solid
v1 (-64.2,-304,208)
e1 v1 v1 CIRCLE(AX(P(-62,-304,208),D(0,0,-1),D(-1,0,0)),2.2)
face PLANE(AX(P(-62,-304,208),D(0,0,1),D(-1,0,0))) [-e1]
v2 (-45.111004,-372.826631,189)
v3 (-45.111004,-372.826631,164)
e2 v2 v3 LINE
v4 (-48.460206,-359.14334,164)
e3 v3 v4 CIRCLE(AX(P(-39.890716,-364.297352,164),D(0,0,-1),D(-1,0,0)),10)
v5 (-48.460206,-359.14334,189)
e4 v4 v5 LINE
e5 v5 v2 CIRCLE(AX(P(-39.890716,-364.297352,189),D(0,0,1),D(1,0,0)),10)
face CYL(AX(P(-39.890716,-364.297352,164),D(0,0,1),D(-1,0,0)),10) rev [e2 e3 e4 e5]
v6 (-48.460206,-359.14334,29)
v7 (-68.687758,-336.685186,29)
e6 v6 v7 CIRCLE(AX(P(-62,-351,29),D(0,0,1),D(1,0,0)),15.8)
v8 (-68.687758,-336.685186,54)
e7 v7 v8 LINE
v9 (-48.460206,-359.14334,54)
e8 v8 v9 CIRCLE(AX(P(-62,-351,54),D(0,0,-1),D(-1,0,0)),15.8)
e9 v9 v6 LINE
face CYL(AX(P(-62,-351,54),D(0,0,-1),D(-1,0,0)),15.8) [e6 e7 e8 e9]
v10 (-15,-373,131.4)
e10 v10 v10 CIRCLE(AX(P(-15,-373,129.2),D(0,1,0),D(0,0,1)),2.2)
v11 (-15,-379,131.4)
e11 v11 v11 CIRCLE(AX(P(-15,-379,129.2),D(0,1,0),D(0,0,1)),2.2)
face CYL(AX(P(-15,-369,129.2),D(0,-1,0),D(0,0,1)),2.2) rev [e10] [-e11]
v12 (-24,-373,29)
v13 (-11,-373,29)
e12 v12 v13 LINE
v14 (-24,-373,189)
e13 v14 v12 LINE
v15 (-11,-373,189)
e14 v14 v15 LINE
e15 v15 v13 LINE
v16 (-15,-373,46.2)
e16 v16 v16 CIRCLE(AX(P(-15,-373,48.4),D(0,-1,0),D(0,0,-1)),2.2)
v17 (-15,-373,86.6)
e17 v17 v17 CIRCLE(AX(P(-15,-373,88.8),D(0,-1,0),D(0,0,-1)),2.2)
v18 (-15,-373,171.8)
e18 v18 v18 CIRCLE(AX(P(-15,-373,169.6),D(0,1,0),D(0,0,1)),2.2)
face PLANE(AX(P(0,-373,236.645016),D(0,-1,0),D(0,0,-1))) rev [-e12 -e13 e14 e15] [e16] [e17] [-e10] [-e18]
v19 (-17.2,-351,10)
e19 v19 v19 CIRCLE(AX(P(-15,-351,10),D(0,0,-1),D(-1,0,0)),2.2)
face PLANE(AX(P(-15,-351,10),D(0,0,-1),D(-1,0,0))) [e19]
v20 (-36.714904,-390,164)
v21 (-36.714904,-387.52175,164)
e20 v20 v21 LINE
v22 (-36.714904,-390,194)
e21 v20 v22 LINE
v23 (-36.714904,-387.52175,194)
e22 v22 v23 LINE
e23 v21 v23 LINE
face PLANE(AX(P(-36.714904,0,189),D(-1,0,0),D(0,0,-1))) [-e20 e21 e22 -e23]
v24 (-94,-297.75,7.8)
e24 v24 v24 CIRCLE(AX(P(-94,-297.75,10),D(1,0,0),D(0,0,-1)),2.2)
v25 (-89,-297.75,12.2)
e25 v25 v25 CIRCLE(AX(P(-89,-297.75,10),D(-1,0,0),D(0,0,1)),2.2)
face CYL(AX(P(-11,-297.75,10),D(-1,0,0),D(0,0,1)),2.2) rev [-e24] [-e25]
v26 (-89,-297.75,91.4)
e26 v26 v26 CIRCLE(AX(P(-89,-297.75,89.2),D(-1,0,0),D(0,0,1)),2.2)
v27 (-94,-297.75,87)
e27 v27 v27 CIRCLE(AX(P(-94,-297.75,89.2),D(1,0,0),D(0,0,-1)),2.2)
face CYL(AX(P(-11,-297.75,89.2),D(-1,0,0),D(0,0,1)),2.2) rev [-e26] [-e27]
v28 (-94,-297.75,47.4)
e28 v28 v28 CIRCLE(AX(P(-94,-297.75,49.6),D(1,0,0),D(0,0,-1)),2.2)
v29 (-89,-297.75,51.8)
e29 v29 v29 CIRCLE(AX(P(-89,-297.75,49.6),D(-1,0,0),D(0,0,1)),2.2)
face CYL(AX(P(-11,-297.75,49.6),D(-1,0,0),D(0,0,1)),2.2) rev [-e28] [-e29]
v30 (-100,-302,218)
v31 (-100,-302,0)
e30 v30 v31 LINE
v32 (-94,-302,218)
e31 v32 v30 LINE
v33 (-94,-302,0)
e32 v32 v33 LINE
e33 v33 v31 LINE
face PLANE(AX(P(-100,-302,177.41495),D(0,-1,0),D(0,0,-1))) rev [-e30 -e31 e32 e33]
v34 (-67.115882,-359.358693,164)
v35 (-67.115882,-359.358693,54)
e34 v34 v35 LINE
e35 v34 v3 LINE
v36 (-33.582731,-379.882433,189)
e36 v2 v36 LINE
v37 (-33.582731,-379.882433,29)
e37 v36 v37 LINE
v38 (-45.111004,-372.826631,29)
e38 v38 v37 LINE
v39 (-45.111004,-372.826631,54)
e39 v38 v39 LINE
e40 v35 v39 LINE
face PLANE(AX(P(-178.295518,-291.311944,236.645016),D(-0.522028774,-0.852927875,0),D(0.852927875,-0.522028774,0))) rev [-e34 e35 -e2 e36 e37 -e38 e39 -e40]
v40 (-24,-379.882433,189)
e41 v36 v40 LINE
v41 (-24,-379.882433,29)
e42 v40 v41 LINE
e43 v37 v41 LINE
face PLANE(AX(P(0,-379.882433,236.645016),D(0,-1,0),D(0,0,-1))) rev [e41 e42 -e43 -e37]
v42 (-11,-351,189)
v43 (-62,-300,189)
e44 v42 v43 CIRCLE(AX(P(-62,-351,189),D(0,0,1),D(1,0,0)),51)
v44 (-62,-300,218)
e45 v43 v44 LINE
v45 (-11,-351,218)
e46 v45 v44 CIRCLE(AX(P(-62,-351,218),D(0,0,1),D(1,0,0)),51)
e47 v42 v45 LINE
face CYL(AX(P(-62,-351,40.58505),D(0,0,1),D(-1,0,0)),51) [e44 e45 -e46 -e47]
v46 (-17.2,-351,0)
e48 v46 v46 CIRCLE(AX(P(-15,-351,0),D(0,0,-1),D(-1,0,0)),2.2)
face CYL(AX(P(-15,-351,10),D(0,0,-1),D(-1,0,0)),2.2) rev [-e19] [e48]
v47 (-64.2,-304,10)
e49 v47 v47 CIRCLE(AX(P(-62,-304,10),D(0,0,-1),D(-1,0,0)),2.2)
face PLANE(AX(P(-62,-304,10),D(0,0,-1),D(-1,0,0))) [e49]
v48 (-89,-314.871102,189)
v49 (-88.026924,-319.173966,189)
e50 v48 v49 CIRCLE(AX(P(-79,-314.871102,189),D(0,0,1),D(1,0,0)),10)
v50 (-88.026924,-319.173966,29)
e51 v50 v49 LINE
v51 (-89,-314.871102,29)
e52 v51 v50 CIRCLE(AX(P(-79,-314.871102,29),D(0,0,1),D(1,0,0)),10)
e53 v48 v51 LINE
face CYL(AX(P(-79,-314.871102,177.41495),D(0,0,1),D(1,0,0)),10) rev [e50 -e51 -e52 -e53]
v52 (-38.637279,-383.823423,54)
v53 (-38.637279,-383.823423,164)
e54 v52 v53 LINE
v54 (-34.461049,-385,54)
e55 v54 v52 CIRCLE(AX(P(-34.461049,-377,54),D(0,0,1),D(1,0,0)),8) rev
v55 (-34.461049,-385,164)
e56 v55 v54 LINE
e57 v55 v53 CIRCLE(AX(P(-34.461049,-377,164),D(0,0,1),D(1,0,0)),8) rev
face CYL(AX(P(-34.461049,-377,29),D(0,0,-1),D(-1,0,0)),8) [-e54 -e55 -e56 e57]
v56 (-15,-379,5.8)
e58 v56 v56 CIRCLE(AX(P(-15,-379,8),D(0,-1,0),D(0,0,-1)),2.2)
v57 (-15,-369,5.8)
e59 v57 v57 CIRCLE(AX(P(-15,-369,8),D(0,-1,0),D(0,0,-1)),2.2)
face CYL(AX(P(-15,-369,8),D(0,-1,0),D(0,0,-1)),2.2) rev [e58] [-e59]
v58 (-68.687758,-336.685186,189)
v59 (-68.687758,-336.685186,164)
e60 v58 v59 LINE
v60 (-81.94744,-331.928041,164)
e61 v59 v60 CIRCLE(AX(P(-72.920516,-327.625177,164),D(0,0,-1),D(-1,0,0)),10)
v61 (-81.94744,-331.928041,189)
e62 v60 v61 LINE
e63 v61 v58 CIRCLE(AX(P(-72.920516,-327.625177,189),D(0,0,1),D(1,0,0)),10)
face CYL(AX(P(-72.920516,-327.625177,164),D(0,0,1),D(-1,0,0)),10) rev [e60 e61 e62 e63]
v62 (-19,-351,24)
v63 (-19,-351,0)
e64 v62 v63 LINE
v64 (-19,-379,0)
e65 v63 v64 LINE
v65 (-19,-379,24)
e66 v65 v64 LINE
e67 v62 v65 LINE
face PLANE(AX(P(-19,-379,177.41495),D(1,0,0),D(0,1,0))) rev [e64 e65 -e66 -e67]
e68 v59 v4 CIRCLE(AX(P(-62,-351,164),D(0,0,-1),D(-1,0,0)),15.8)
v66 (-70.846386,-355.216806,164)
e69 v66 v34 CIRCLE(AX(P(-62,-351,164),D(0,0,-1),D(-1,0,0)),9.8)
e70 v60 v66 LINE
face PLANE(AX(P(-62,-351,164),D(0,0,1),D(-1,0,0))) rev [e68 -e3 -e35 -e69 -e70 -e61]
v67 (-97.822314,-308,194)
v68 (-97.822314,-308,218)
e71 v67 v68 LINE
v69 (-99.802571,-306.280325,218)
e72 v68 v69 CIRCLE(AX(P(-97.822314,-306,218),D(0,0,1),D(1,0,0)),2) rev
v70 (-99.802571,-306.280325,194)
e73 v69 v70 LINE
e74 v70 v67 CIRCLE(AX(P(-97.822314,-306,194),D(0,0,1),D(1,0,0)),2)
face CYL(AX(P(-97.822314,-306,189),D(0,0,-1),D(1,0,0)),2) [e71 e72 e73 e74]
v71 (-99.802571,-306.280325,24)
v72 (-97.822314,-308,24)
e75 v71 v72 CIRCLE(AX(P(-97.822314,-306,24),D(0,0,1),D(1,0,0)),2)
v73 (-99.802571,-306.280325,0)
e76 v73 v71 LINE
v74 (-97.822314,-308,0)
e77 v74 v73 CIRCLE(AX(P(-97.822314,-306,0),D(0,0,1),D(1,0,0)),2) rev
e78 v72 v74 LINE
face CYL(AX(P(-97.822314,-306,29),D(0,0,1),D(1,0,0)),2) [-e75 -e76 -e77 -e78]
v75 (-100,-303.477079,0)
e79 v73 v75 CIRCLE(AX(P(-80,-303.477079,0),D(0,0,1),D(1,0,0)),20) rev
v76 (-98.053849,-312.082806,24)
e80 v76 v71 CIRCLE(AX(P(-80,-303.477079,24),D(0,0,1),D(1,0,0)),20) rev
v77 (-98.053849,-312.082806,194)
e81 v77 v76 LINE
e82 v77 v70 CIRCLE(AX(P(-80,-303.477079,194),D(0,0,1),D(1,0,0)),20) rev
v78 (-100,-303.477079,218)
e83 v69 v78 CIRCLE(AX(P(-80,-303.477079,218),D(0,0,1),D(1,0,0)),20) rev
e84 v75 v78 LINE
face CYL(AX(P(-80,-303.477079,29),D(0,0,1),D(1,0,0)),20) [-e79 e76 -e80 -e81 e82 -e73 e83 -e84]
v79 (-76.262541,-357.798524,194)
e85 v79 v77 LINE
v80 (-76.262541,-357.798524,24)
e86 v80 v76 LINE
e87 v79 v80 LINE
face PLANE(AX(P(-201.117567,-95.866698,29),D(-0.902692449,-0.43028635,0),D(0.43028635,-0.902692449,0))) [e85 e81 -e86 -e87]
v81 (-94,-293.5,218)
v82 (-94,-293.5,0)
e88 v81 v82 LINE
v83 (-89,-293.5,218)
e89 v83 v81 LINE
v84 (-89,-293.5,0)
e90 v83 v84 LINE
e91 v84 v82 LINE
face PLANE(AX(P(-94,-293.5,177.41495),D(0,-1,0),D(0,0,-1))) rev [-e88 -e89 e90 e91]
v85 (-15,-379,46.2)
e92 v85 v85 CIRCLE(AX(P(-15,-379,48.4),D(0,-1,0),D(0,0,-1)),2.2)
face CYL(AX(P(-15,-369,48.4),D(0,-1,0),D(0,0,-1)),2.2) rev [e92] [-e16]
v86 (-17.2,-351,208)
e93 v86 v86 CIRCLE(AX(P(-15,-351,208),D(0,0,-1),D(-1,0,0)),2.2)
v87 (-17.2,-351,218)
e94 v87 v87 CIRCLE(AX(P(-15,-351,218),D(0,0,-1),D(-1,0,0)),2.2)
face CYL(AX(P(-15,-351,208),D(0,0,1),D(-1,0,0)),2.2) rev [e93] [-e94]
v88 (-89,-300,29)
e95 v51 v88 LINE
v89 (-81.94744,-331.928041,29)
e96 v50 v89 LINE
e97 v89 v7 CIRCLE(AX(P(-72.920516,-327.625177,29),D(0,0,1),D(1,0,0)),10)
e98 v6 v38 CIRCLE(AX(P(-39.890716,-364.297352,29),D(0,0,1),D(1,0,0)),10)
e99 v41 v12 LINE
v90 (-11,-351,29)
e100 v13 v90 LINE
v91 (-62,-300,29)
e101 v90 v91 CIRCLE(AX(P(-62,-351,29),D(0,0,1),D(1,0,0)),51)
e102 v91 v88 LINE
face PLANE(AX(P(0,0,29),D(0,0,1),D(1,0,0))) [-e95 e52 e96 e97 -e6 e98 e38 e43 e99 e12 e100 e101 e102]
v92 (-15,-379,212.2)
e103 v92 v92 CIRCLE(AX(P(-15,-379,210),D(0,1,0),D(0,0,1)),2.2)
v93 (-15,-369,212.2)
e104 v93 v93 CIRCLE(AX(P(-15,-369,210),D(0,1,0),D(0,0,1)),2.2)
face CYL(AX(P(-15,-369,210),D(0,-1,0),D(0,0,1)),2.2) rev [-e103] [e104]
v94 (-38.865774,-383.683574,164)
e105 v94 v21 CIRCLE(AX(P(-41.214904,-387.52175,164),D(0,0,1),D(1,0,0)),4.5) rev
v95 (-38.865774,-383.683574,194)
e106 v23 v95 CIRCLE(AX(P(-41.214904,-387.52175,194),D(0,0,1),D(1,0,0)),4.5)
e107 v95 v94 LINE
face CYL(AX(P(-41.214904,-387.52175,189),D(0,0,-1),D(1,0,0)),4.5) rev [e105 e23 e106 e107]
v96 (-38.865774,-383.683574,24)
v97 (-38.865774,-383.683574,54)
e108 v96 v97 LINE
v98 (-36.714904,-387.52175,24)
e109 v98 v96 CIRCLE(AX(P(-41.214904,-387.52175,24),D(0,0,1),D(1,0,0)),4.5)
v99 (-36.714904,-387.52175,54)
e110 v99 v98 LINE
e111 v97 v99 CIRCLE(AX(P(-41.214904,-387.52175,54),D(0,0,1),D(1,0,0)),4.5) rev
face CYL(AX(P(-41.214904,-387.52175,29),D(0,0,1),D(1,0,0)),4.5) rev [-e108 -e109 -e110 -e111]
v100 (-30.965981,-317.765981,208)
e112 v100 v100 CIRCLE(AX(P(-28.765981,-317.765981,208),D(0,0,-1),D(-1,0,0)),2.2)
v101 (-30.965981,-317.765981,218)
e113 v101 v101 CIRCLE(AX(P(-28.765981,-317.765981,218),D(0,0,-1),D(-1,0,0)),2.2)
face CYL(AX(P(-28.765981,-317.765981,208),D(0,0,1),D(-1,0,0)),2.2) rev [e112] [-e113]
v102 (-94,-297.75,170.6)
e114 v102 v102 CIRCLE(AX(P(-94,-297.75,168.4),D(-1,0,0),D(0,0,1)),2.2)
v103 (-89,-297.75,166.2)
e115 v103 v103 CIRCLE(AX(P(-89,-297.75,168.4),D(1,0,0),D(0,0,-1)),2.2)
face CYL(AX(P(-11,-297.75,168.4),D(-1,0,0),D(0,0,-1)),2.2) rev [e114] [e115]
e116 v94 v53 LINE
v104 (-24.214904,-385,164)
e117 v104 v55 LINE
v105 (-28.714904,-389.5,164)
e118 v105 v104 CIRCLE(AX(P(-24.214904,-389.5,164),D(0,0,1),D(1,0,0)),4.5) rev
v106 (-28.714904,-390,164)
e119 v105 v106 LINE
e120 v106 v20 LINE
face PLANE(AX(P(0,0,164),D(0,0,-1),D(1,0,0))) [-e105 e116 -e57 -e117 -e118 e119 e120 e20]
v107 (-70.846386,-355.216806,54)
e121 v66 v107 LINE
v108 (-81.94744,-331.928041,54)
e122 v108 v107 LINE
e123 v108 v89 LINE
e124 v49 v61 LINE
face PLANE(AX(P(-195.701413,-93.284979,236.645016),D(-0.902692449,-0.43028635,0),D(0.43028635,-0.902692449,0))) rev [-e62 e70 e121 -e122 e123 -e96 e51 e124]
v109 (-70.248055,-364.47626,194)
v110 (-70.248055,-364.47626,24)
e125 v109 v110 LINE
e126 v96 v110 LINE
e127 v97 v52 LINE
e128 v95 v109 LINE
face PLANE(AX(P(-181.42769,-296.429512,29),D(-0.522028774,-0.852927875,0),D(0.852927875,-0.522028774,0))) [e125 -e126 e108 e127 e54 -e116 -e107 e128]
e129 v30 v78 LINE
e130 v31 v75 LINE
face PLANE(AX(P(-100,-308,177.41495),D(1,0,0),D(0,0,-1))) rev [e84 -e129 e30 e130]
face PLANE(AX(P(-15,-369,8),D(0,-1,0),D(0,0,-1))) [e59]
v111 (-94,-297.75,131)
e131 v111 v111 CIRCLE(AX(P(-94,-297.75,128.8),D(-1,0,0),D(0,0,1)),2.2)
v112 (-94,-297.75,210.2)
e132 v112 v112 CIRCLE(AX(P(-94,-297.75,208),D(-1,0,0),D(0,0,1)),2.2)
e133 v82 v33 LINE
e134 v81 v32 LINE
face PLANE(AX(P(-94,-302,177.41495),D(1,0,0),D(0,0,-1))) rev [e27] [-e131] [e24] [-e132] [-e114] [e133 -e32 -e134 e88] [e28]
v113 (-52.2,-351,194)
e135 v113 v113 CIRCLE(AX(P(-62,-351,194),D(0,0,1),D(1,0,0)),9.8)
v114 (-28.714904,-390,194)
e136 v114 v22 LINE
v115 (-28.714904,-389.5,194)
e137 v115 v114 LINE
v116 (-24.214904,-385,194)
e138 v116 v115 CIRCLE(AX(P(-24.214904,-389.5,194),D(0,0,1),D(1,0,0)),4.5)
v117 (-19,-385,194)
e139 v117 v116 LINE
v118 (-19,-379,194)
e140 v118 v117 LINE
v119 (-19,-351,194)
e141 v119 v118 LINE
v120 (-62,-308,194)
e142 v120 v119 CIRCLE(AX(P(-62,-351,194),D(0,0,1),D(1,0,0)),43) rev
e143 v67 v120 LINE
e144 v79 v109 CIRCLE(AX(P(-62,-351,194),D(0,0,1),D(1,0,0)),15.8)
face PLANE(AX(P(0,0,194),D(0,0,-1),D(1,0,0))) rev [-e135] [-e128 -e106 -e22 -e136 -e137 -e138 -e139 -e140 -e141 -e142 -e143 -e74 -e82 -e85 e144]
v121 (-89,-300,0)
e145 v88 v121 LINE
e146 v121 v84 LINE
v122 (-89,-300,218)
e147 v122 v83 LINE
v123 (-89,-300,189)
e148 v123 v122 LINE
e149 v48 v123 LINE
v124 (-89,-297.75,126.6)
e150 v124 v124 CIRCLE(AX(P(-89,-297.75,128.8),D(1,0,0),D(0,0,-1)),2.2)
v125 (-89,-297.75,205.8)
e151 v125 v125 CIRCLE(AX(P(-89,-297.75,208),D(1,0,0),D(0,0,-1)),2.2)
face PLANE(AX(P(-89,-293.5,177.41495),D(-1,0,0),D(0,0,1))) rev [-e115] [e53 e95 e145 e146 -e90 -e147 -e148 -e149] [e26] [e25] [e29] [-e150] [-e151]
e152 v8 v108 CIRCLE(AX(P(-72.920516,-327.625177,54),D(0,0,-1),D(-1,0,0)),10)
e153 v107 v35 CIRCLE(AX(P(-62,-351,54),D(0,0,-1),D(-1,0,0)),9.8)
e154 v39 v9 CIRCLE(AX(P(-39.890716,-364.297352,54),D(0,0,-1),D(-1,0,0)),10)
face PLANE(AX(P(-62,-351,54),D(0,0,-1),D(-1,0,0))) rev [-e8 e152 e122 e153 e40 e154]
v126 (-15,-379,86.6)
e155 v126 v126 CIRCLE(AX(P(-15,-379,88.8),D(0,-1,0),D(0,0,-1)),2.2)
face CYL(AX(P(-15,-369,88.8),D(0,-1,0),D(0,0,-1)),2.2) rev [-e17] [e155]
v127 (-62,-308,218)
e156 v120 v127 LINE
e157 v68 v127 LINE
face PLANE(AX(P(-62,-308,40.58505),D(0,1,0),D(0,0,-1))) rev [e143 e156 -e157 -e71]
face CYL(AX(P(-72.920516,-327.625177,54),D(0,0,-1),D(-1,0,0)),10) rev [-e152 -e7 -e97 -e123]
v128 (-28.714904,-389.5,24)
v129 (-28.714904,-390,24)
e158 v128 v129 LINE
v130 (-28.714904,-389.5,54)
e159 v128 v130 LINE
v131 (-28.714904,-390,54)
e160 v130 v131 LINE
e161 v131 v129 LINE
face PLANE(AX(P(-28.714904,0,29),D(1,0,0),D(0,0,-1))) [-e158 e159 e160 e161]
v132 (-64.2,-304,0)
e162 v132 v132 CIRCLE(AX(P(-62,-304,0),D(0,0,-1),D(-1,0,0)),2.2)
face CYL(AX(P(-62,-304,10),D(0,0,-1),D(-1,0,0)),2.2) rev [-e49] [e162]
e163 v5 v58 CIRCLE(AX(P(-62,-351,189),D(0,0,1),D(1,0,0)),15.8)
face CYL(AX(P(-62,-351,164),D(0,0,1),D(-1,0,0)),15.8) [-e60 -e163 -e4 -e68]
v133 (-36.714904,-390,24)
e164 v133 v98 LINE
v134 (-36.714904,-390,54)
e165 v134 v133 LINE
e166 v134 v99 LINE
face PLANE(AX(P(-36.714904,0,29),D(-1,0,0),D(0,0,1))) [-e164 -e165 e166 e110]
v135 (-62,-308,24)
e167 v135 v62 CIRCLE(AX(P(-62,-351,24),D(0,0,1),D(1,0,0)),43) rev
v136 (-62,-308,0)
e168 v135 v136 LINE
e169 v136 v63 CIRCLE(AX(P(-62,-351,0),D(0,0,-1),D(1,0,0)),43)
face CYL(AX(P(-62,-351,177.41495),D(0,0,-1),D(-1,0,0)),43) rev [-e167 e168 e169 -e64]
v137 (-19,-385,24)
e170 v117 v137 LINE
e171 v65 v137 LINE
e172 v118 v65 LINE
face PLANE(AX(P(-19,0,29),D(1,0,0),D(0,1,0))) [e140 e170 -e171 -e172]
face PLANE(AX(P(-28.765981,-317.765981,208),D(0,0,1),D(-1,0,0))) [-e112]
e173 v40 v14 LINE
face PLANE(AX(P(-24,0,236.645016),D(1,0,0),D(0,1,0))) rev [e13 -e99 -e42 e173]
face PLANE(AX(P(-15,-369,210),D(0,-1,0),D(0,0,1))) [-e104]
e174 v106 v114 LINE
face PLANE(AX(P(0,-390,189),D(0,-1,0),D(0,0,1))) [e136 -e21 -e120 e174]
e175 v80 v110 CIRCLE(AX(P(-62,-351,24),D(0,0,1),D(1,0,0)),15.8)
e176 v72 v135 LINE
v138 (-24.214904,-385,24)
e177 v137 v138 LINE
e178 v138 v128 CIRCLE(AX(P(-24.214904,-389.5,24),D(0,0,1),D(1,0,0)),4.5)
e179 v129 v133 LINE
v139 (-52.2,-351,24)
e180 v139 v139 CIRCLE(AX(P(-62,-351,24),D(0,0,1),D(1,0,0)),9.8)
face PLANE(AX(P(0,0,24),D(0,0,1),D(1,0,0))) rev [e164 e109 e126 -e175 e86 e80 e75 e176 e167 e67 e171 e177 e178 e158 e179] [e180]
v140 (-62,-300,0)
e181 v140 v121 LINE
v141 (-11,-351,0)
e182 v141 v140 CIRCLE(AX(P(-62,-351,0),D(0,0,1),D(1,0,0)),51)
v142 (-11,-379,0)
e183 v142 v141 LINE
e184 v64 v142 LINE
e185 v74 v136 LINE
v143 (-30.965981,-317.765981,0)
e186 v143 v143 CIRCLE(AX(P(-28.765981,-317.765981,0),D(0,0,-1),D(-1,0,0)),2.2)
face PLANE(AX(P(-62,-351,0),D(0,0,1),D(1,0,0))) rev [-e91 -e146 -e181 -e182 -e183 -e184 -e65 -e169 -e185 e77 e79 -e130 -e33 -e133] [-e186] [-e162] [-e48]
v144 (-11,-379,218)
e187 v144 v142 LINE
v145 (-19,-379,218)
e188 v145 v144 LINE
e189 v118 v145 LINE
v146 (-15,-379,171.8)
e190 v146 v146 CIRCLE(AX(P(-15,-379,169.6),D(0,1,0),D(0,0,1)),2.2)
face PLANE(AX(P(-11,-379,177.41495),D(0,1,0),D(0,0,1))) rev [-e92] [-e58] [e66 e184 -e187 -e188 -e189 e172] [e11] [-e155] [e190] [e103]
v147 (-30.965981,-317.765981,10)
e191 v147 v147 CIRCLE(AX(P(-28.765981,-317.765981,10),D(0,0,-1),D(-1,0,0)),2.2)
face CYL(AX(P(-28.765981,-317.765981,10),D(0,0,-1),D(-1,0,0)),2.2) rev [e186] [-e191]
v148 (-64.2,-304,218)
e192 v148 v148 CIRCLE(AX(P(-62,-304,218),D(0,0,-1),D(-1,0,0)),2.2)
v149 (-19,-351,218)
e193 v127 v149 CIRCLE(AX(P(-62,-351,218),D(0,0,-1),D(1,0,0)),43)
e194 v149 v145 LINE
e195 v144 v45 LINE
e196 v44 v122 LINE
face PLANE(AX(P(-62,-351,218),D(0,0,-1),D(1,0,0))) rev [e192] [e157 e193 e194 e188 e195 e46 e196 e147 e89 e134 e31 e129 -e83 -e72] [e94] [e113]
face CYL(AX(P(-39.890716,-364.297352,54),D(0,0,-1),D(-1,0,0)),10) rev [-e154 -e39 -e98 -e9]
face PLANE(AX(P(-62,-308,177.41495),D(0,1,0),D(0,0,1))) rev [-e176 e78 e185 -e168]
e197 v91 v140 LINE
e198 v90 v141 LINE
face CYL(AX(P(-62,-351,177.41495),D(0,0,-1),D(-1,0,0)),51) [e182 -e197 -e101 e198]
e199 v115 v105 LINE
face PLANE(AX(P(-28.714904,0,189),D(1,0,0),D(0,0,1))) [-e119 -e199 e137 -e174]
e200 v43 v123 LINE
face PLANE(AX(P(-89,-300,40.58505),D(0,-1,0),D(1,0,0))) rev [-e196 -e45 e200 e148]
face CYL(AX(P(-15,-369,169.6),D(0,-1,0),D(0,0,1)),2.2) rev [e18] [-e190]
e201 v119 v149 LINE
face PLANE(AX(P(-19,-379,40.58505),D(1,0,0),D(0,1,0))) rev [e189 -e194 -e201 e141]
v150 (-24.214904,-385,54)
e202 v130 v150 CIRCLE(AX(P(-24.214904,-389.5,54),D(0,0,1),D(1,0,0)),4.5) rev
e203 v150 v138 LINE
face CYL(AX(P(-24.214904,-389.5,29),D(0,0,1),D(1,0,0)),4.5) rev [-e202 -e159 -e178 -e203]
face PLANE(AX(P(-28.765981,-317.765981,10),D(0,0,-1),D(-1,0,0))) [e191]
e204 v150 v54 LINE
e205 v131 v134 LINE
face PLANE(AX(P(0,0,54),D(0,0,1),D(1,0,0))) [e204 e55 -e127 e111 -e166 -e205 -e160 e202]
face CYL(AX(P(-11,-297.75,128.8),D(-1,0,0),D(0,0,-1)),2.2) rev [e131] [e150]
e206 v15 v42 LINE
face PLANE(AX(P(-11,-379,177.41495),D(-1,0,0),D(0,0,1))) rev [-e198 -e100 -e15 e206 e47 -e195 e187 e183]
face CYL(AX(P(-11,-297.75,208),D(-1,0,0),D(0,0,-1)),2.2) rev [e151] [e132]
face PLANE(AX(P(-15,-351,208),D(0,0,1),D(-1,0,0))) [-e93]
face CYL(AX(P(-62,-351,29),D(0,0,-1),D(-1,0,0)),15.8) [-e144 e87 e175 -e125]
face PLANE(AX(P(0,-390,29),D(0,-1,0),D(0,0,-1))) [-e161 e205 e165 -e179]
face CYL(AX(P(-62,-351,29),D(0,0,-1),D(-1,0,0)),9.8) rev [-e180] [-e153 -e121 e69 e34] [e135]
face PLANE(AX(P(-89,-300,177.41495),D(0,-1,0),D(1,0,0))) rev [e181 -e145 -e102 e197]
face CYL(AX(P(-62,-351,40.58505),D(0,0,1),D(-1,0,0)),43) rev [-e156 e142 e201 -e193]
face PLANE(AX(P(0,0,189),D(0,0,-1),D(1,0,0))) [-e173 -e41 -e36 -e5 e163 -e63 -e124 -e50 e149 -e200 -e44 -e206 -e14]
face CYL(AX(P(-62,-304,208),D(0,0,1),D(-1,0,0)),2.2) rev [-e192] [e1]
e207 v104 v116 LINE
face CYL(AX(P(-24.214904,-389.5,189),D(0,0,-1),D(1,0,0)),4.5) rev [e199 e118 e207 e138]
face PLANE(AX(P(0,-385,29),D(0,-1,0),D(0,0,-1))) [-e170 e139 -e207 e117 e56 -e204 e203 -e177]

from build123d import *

# Parameters (mm, degrees)
EXTRUDE_1_DEPTH          = 24
SKETCH_3_W               = 8
SKETCH_3_H               = 5
SKETCH_3_H_2             = 6
EXTRUDE_2_DEPTH          = 5
SKETCH_3_4_W             = 8
SKETCH_3_4_H             = 6
EXTRUDE_3_DEPTH          = 85
SKETCH_3_5_W             = 8
SKETCH_3_5_H             = 5
EXTRUDE_5_DEPTH          = 30
SKETCH_4_R               = 15.8
SKETCH_4_R_2             = 9.8
EXTRUDE_4_DEPTH          = 30
FILLET_1_R               = 10
FILLET_2_R               = 4.5
FILLET_3_R               = 20
FILLET_4_R               = 8
FILLET_5_R               = 2
CUT_EXTRUDE_1_DEPTH      = 414.364246156
CUT_EXTRUDE_1_DEPTH_BACK = 414.364246156
SKETCH_5_R               = 2.2
SKETCH_7_R               = 2.2
CUT_EXTRUDE_2_DEPTH      = 10
SKETCH_8_R               = 2.2
CUT_EXTRUDE_3_DEPTH      = 10


with BuildPart() as part:
    # Эскиз1 → Бобышка-Вытянуть1 (new body)
    with BuildSketch(Plane.XY):
        with BuildLine():
            Line((-62, -308), (-94, -308))
            Line((-94, -308), (-100, -308))
            Line((-100, -308), (-100, -302))
            Line((-100, -302), (-94, -302))
            Line((-94, -302), (-94, -293.5))
            Line((-94, -293.5), (-89, -293.5))
            Line((-89, -293.5), (-89, -300))
            Line((-89, -300), (-62, -300))
            ThreePointArc((-62, -300), (-25.937554159, -314.937554159), (-11, -351))
            Line((-11, -351), (-11, -379))
            Line((-11, -379), (-19, -379))
            Line((-19, -379), (-19, -351))
            ThreePointArc((-19, -351), (-31.594408409, -320.594408409), (-62, -308))
        make_face()
    extrude(amount=EXTRUDE_1_DEPTH)

    # Эскиз3 → Бобышка-Вытянуть2 (add)
    with BuildSketch(Plane.XY.offset(24)):
        with BuildLine():
            Line((-19, -351), (-19, -373))
            Line((-19, -373), (-11, -373))
            Line((-11, -373), (-11, -351))
            ThreePointArc((-11, -351), (-25.937554159, -314.937554159), (-62, -300))
            Line((-62, -300), (-89, -300))
            Line((-89, -300), (-89, -308))
            Line((-89, -308), (-62, -308))
            ThreePointArc((-62, -308), (-31.594408409, -320.594408409), (-19, -351))
        make_face()
        with BuildLine():
            Line((-24, -373), (-19, -373))
            Line((-19, -373), (-19, -351))
            ThreePointArc((-19, -351), (-31.594408409, -320.594408409), (-62, -308))
            Line((-62, -308), (-89, -308))
            Line((-89, -308), (-89, -317.132562387))
            Line((-89, -317.132562387), (-70.846385997, -355.21680623))
            ThreePointArc((-70.846385997, -355.21680623), (-64.161644886, -341.441376072), (-52.2, -351))
            ThreePointArc((-52.2, -351), (-57.209156829, -359.549141578), (-67.115881983, -359.358693172))
            Line((-67.115881983, -359.358693172), (-33.582731203, -379.882432752))
            Line((-33.582731203, -379.882432752), (-24, -379.882432752))
            Line((-24, -379.882432752), (-24, -373))
        make_face()
        with BuildLine():
            Line((-19, -385), (-19, -379))
            Line((-19, -379), (-19, -373))
            Line((-19, -373), (-24, -373))
            Line((-24, -373), (-24, -379.882432752))
            Line((-24, -379.882432752), (-33.582731203, -379.882432752))
            Line((-33.582731203, -379.882432752), (-67.115881983, -359.358693172))
            ThreePointArc((-67.115881983, -359.358693172), (-69.281829347, -357.558579218), (-70.846385997, -355.21680623))
            Line((-70.846385997, -355.21680623), (-89, -317.132562387))
            Line((-89, -317.132562387), (-89, -308))
            Line((-89, -308), (-100, -308))
            Line((-100, -308), (-76.26254069, -357.79852433))
            ThreePointArc((-76.26254069, -357.79852433), (-73.740092213, -361.574035882), (-70.248054625, -364.47626042))
            Line((-70.248054625, -364.47626042), (-36.714903846, -385))
            Line((-36.714903846, -385), (-28.714903846, -385))
            Line((-28.714903846, -385), (-19, -385))
        make_face()
        with Locations((-32.714903846, -387.5)):
            Rectangle(SKETCH_3_W, SKETCH_3_H)
        Polygon((-100, -308), (-89, -308), (-89, -300), (-89, -293.5), (-94, -293.5), (-94, -302), (-100, -302), align=None)
        with Locations((-15, -376)):
            Rectangle(SKETCH_3_W, SKETCH_3_H_2)
    extrude(amount=EXTRUDE_2_DEPTH)

    # Эскиз3<4> → Бобышка-Вытянуть3 (add)
    with BuildSketch(Plane.XY.offset(24)):
        with BuildLine():
            Line((-19, -385), (-19, -379))
            Line((-19, -379), (-19, -373))
            Line((-19, -373), (-24, -373))
            Line((-24, -373), (-24, -379.882432752))
            Line((-24, -379.882432752), (-33.582731203, -379.882432752))
            Line((-33.582731203, -379.882432752), (-67.115881983, -359.358693172))
            ThreePointArc((-67.115881983, -359.358693172), (-69.281829347, -357.558579218), (-70.846385997, -355.21680623))
            Line((-70.846385997, -355.21680623), (-89, -317.132562387))
            Line((-89, -317.132562387), (-89, -308))
            Line((-89, -308), (-100, -308))
            Line((-100, -308), (-76.26254069, -357.79852433))
            ThreePointArc((-76.26254069, -357.79852433), (-73.740092213, -361.574035882), (-70.248054625, -364.47626042))
            Line((-70.248054625, -364.47626042), (-36.714903846, -385))
            Line((-36.714903846, -385), (-28.714903846, -385))
            Line((-28.714903846, -385), (-19, -385))
        make_face()
        Polygon((-100, -308), (-89, -308), (-89, -300), (-89, -293.5), (-94, -293.5), (-94, -302), (-100, -302), align=None)
        with Locations((-15, -376)):
            Rectangle(SKETCH_3_4_W, SKETCH_3_4_H)
    extrude(amount=EXTRUDE_3_DEPTH)

    # Эскиз3<5> → Бобышка-Вытянуть5 (add)
    with BuildSketch(Plane.XY.offset(24)):
        with Locations((-32.714903846, -387.5)):
            Rectangle(SKETCH_3_5_W, SKETCH_3_5_H)
    extrude(amount=EXTRUDE_5_DEPTH)

    # Эскиз4 → Бобышка-Вытянуть4 (add)
    with BuildSketch(Plane(origin=(0, 0, 24), x_dir=(-1, 0, 0), z_dir=(0, 0, -1))):
        with Locations((62, -351)):
            Circle(SKETCH_4_R)
        with Locations(Location((62, -351, 0), (0, 0, 334.514265995))):
            Circle(SKETCH_4_R_2, mode=Mode.SUBTRACT)
    extrude(amount=-EXTRUDE_4_DEPTH)

    # Скругление1
    fillet_1_edges = [part.edges().sort_by_distance(p)[0] for p in [
        (-89, -317.132562387, 69),
        (-56.545080529, -365.828481162, 41.5),
        (-76.179159974, -344.029245204, 41.5),
    ]]
    fillet(fillet_1_edges, radius=FILLET_1_R)

    # Скругление2
    fillet_2_edges = [part.edges().sort_by_distance(p)[0] for p in [
        (-36.714903846, -385, 39),
        (-28.714903846, -385, 39),
    ]]
    fillet(fillet_2_edges, radius=FILLET_2_R)

    # Скругление3
    # the kernel refuses this fillet: 20 mm, written as the material it takes off along each edge
    with BuildSketch(Plane(origin=(-100, -308, -3.137524006), x_dir=(0, 1, 0), z_dir=(0, 0, 1))) as fillet_3_piece_1:
        with BuildLine():
            CenterArc((FILLET_3_R * 0.226146033386, -FILLET_3_R), FILLET_3_R, 90, 25.485734005)
            Line((-FILLET_3_R * 0.204140316645, -FILLET_3_R * 0.0973075512795), (-FILLET_3_R * 0.212746043646, -FILLET_3_R * 0.0792537023051))
            Line((-FILLET_3_R * 0.212746043646, -FILLET_3_R * 0.0792537023051), (-FILLET_3_R * 0.00452292066771, FILLET_3_R * 0.02))
            Line((-FILLET_3_R * 0.00452292066771, FILLET_3_R * 0.02), (FILLET_3_R * 0.226146033386, FILLET_3_R * 0.02))
            Line((FILLET_3_R * 0.226146033386, FILLET_3_R * 0.02), (FILLET_3_R * 0.226146033386, 0))
        make_face()
    extrude(amount=139.275048013, mode=Mode.SUBTRACT)

    # Скругление4
    fillet_4_edges = [part.edges().sort_by_distance(p)[0] for p in [
        (-36.714903846, -385, 81.5),
    ]]
    fillet(fillet_4_edges, radius=FILLET_4_R)

    # Скругление5
    fillet_5_edges = [part.edges().sort_by_distance(p)[0] for p in [
        (-99.481868202, -308, 12),
    ]]
    fillet(fillet_5_edges, radius=FILLET_5_R)

    # Эскиз5 → Вырез-Вытянуть1 (cut, two sides: drawn at the far end of the back side and taken through both)
    with BuildSketch(Plane.ZY.offset(94).offset(-CUT_EXTRUDE_1_DEPTH_BACK)):
        with Locations((89.2, -297.75)):
            Circle(SKETCH_5_R)
        with Locations((10, -297.75)):
            Circle(SKETCH_5_R)
        with Locations((49.6, -297.75)):
            Circle(SKETCH_5_R)
    extrude(amount=CUT_EXTRUDE_1_DEPTH + CUT_EXTRUDE_1_DEPTH_BACK, mode=Mode.SUBTRACT)

    # Эскиз7 → Вырез-Вытянуть2 (cut)
    with BuildSketch(Plane.XZ.offset(379)):
        with Locations(Location((-15, 88.8, 0), (0, 0, 270))):
            Circle(SKETCH_7_R)
        with Locations(Location((-15, 48.4, 0), (0, 0, 270))):
            Circle(SKETCH_7_R)
        with Locations(Location((-15, 8, 0), (0, 0, 270))):
            Circle(SKETCH_7_R)
    extrude(amount=-CUT_EXTRUDE_2_DEPTH, mode=Mode.SUBTRACT)

    # Эскиз8 → Вырез-Вытянуть3 (cut)
    with BuildSketch(Plane(origin=(0, 0, 0), x_dir=(-1, 0, 0), z_dir=(0, 0, -1))):
        with Locations((62, -304)):
            Circle(SKETCH_8_R)
        with Locations((28.765981284, -317.765981284)):
            Circle(SKETCH_8_R)
        with Locations((15, -351)):
            Circle(SKETCH_8_R)
    extrude(amount=-CUT_EXTRUDE_3_DEPTH, mode=Mode.SUBTRACT)

    # Зеркальное отражение1: part across plane


with BuildPart() as part_1:
    add(part.part)
    add(part.part.mirror(Plane(origin=(0, 0, 109), x_dir=(1, 0, 0), z_dir=(0, 0, -1))))


solid = part_1.part
